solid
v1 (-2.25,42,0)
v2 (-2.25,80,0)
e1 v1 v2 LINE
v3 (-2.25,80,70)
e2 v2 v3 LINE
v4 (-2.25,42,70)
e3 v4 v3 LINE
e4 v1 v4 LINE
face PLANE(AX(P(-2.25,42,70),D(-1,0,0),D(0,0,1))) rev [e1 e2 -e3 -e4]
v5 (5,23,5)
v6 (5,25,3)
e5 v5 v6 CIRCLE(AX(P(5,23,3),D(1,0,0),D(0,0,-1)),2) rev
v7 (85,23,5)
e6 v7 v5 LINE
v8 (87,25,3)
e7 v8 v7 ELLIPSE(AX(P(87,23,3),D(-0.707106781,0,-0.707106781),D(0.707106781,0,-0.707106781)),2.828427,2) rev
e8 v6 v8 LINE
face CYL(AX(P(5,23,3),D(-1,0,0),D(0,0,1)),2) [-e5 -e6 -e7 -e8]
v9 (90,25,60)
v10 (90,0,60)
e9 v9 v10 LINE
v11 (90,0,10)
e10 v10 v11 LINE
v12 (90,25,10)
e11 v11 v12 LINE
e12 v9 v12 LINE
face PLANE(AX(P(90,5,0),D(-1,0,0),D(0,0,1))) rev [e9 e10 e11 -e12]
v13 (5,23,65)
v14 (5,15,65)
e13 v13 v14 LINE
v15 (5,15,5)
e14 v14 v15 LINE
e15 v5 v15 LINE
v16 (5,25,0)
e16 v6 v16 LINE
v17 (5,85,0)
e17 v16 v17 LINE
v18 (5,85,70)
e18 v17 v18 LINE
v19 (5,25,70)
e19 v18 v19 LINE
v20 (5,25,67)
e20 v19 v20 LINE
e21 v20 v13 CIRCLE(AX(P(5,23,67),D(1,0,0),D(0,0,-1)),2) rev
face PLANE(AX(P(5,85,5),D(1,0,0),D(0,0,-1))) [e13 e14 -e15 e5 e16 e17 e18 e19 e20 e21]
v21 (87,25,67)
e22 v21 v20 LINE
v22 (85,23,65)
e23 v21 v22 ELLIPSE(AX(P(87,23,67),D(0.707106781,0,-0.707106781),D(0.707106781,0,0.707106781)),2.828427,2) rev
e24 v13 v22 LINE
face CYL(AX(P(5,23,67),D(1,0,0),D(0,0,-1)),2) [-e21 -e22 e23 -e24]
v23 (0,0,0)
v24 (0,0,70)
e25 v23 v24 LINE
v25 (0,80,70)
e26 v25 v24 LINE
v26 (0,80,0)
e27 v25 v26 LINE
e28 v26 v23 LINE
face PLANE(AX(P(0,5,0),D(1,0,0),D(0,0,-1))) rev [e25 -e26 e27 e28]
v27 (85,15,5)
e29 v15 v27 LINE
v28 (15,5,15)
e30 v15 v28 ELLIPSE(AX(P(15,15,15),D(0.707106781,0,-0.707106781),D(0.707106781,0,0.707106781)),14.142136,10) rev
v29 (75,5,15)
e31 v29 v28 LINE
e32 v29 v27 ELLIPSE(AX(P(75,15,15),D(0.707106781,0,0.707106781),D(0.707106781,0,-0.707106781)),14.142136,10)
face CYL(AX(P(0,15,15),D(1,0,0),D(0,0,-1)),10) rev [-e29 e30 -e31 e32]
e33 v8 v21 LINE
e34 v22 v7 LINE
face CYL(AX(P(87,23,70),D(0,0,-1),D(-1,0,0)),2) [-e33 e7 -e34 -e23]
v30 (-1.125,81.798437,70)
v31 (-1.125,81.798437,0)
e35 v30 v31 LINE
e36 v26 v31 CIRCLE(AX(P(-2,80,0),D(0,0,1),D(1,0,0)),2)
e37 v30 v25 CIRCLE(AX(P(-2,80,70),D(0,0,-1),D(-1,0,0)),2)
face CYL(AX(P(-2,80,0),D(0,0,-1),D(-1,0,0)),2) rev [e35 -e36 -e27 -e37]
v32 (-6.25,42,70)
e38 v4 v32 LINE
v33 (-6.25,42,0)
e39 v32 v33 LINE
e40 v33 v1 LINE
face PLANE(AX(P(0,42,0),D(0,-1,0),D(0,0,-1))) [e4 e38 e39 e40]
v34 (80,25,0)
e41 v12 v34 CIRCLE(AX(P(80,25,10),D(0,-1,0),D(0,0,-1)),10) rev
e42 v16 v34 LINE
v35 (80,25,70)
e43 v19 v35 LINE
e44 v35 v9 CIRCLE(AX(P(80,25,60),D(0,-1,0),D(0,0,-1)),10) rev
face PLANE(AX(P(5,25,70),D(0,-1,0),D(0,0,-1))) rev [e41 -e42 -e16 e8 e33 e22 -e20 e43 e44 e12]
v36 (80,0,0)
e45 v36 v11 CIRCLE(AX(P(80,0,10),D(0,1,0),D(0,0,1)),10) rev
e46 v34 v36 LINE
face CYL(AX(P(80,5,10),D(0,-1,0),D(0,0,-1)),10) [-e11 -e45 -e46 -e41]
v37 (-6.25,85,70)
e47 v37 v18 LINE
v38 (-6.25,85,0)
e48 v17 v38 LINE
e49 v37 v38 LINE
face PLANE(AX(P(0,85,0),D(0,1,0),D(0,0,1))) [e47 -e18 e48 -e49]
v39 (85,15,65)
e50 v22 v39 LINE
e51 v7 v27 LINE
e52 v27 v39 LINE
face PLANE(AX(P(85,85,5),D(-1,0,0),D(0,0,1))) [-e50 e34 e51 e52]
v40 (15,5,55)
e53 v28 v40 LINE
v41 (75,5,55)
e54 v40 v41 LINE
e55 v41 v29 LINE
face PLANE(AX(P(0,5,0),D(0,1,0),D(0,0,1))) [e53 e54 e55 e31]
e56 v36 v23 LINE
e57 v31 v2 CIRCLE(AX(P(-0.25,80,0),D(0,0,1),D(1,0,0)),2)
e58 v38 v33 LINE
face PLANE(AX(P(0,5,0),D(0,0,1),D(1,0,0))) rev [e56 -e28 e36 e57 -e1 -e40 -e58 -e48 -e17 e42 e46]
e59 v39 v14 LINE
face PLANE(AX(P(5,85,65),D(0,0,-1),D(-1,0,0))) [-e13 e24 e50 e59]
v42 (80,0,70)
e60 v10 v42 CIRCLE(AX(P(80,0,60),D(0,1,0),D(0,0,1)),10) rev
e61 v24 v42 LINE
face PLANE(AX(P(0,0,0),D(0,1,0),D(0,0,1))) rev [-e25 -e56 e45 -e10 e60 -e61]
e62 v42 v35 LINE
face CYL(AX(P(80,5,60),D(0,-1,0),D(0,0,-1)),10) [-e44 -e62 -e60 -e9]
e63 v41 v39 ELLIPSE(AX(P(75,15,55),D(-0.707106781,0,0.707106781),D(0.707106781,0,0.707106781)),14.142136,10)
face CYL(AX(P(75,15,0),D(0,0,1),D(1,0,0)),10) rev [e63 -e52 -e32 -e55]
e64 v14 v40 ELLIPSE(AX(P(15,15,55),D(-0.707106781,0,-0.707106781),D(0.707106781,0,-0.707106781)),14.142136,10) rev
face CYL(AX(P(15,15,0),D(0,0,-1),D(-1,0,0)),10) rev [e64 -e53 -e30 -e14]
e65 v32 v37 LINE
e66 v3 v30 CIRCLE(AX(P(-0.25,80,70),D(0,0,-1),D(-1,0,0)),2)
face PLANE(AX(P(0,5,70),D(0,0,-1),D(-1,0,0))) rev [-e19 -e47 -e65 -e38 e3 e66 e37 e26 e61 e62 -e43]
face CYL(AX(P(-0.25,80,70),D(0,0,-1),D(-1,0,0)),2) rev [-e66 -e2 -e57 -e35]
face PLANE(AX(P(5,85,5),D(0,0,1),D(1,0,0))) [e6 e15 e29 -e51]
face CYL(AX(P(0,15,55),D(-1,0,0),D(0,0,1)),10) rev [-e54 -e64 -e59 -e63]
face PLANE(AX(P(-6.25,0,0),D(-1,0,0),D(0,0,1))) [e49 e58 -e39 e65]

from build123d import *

# Parameters (mm, degrees)
SKETCH1_W           = 90
SKETCH1_H           = 70
BOSS_EXTRUDE1_DEPTH = 5
SKETCH2_W           = 90
SKETCH2_H           = 70
SKETCH2_W_2         = 80
SKETCH2_H_2         = 60
BOSS_EXTRUDE2_DEPTH = 80
SKETCH3_W           = 70
SKETCH3_H           = 3
BOSS_EXTRUDE4_DEPTH = 6.25
SKETCH4_W           = 4
SKETCH4_H           = 70
BOSS_EXTRUDE5_DEPTH = 40
SKETCH5_W           = 70
SKETCH5_H           = 60
CUT_EXTRUDE3_DEPTH  = 85
FILLET1_R           = 10
FILLET2_R           = 2
FILLET3_R           = 2
FILLET4_R           = 10


with BuildPart() as part:
    # Sketch1 → Boss-Extrude1 (new body)
    with BuildSketch(Plane(origin=(0, 0, 0), x_dir=(1, 0, 0), z_dir=(0, 1, 0))):
        with Locations((45, -35)):
            Rectangle(SKETCH1_W, SKETCH1_H)
    extrude(amount=BOSS_EXTRUDE1_DEPTH)

    # Sketch2 → Boss-Extrude2 (add)
    with BuildSketch(Plane(origin=(0, 5, 0), x_dir=(1, 0, 0), z_dir=(0, 1, 0))):
        with Locations((45, -35)):
            Rectangle(SKETCH2_W, SKETCH2_H)
        with Locations((45, -35)):
            Rectangle(SKETCH2_W_2, SKETCH2_H_2, mode=Mode.SUBTRACT)
    extrude(amount=BOSS_EXTRUDE2_DEPTH)

    # Sketch3 → Boss-Extrude4 (add)
    with BuildSketch(Plane.ZY):
        with Locations((35, 83.5)):
            Rectangle(SKETCH3_W, SKETCH3_H)
    extrude(amount=BOSS_EXTRUDE4_DEPTH)

    # Sketch4 → Boss-Extrude5 (add)
    with BuildSketch(Plane.XZ.offset(-82)):
        with Locations((-4.25, 35)):
            Rectangle(SKETCH4_W, SKETCH4_H)
    extrude(amount=BOSS_EXTRUDE5_DEPTH)

    # Sketch5 → Cut-Extrude3 (cut)
    with BuildSketch(Plane(origin=(90, 0, 0), x_dir=(0, 0, -1), z_dir=(1, 0, 0))):
        with Locations((-35, 55)):
            Rectangle(SKETCH5_W, SKETCH5_H)
    extrude(amount=-CUT_EXTRUDE3_DEPTH, mode=Mode.SUBTRACT)

    # Fillet1
    fillet1_edges = [part.edges().sort_by_distance(p)[0] for p in [
        (5, 5, 35),
        (45, 5, 65),
        (85, 5, 35),
        (45, 5, 5),
    ]]
    fillet(fillet1_edges, radius=FILLET1_R)

    # Fillet2
    # the kernel refuses this fillet: 2 mm, written as the material it adds along each edge
    with BuildSketch(Plane(origin=(0, 82, 70), x_dir=(-1, 0, 0), z_dir=(0, 0, -1)), Plane(origin=(-2.25, 82, 70), x_dir=(0, -1, 0), z_dir=(0, 0, -1))) as fillet2_piece_1:
        with BuildLine():
            CenterArc((FILLET2_R, -FILLET2_R), FILLET2_R, 90, 90)
            Line((0, -FILLET2_R), (0, 0))
            Line((0, 0), (FILLET2_R, 0))
        make_face()
    extrude(amount=70)

    # Fillet3
    fillet3_edges = [part.edges().sort_by_distance(p)[0] for p in [
        (45, 25, 5),
        (85, 25, 35),
        (45, 25, 65),
    ]]
    fillet(fillet3_edges, radius=FILLET3_R)

    # Fillet4
    fillet4_edges = [part.edges().sort_by_distance(p)[0] for p in [
        (90, 12.5, 0),
        (90, 12.5, 70),
    ]]
    fillet(fillet4_edges, radius=FILLET4_R)


solid = part.part
